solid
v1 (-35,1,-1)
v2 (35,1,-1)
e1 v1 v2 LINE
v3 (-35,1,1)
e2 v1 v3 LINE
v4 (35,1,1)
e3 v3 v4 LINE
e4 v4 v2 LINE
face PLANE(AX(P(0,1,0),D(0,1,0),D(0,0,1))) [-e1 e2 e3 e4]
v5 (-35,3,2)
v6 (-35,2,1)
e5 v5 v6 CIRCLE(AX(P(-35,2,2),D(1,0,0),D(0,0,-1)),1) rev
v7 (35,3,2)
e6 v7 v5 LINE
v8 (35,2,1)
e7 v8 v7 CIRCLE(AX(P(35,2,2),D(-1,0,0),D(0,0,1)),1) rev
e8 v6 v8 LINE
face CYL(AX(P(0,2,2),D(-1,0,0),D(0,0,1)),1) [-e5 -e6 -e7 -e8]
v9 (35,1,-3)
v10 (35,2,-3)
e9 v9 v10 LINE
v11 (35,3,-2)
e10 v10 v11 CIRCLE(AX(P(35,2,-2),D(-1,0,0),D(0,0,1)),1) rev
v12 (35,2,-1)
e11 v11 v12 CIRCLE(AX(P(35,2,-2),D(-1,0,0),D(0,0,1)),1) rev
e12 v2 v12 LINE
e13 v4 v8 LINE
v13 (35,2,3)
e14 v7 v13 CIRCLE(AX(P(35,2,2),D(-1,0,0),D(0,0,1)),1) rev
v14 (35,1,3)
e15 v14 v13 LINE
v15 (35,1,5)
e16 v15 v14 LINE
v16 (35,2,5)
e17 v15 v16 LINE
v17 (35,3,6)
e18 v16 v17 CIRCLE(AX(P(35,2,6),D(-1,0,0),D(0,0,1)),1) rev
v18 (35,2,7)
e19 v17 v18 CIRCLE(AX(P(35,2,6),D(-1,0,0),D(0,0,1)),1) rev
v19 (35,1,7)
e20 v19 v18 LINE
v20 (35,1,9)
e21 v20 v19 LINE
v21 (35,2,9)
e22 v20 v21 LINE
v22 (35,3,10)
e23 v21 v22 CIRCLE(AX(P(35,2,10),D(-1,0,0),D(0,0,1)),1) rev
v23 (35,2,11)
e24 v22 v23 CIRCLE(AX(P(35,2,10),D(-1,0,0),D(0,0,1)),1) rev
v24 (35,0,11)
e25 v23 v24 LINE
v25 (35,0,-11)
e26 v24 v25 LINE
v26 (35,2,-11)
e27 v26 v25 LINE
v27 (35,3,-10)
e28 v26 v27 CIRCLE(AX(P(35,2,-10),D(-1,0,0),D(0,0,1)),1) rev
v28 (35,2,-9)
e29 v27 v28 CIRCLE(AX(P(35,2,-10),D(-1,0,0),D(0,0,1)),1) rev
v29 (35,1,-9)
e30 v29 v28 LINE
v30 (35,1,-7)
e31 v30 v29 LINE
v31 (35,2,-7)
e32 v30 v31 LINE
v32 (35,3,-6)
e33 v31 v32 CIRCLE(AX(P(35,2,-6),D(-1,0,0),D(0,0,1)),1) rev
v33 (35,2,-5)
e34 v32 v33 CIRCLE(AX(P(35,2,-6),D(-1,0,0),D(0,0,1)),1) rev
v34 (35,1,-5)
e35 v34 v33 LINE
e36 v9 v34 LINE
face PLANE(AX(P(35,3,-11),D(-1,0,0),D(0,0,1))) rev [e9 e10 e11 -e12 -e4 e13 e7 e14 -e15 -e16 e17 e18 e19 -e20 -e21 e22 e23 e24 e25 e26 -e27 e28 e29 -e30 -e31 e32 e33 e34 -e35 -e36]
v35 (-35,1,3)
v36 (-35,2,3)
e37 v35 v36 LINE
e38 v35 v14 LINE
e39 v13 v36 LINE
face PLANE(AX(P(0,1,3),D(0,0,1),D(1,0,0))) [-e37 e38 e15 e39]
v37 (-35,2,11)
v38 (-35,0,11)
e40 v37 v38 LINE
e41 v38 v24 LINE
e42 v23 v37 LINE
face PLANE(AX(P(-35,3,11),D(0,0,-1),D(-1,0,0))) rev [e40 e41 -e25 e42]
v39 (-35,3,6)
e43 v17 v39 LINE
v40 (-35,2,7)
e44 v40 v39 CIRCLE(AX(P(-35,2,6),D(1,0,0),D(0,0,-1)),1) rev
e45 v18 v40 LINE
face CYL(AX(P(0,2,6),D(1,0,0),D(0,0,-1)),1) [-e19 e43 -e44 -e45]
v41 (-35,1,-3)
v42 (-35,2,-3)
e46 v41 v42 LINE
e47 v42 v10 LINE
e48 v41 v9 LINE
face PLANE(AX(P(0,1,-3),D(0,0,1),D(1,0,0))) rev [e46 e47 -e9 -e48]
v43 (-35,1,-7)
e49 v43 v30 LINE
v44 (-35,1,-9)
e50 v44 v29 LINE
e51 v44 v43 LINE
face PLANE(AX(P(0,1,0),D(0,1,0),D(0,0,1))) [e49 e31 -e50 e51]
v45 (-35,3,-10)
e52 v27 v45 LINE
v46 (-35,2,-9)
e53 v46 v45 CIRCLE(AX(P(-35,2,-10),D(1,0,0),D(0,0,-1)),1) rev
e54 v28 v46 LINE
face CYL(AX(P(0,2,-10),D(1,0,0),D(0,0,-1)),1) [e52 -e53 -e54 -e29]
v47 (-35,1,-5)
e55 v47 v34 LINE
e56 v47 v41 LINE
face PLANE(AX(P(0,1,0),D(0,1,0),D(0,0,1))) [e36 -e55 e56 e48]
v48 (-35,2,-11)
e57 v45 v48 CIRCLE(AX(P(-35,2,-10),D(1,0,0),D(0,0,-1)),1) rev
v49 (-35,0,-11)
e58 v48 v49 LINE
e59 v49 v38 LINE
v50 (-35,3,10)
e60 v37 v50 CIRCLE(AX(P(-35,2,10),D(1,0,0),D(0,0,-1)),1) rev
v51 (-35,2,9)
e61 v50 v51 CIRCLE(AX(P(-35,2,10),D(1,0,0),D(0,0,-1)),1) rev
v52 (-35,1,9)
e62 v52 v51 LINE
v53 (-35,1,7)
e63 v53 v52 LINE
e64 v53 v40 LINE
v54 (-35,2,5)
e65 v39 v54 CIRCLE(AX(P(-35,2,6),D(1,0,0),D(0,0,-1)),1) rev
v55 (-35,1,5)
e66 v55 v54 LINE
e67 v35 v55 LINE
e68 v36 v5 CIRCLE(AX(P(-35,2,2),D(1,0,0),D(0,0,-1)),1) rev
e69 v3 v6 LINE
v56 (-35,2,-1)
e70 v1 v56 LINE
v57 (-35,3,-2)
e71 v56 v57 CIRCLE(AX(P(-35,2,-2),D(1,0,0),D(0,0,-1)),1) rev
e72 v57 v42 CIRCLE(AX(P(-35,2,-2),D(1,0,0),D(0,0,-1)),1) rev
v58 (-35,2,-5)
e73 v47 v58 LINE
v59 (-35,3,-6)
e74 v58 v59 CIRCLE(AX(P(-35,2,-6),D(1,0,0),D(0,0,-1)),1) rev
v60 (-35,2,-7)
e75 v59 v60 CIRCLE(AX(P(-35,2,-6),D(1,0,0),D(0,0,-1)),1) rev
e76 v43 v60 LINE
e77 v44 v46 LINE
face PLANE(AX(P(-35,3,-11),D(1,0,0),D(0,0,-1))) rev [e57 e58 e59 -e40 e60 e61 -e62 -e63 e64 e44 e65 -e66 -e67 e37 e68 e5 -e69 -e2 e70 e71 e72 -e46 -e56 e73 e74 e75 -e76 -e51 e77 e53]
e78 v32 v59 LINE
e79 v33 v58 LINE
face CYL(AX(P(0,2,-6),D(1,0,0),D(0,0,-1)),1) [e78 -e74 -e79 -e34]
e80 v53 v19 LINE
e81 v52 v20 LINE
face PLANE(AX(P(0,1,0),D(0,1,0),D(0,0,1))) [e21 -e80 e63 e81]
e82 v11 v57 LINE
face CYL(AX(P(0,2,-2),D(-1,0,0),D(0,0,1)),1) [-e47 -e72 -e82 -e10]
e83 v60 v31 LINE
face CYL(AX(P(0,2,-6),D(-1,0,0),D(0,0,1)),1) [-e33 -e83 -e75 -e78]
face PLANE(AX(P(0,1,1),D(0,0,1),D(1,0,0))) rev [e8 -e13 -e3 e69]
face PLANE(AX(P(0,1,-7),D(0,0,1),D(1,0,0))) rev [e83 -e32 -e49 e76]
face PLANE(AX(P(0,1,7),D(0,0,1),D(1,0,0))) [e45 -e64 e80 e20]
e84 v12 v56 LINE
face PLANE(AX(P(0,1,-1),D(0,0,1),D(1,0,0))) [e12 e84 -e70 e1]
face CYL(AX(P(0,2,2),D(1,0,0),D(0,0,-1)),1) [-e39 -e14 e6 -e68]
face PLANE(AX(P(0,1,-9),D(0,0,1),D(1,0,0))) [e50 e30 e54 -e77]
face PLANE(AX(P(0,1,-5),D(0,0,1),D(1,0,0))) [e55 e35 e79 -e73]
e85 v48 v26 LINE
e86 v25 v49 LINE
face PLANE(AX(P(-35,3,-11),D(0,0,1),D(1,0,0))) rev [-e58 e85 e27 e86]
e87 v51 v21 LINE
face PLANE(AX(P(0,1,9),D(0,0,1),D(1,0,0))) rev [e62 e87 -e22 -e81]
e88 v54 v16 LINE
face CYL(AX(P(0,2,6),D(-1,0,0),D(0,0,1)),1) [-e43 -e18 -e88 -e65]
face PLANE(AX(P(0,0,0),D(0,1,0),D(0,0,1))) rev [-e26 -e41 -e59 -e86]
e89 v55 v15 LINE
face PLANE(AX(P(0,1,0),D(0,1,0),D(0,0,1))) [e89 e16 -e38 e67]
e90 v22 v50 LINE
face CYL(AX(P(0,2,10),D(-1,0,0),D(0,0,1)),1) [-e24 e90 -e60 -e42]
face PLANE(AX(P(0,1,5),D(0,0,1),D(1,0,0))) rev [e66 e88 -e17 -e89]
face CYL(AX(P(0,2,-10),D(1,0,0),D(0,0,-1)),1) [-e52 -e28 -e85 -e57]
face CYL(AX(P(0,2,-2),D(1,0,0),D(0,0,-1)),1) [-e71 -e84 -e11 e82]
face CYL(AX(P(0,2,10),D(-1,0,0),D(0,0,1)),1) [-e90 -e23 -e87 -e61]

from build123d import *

# Parameters (mm, degrees)
SKETCH_1_W          = 70
SKETCH_1_H          = 22
EXTRUDE_1_DEPTH     = 3
SKETCH_2_W          = 35
SKETCH_2_H          = 2
CUT_EXTRUDE_1_DEPTH = 2
FILLET_1_R          = 1


with BuildPart() as part:
    # 草图1 → 凸台-拉伸1 (new body)
    with BuildSketch(Plane(origin=(0, 0, 0), x_dir=(1, 0, 0), z_dir=(0, 1, 0))):
        Rectangle(SKETCH_1_W, SKETCH_1_H)
    extrude(amount=EXTRUDE_1_DEPTH)

    # 草图2 → 切除-拉伸1 (cut)
    with BuildSketch(Plane(origin=(0, 3, 0), x_dir=(1, 0, 0), z_dir=(0, 1, 0))):
        with Locations((17.5, -8)):
            Rectangle(SKETCH_2_W, SKETCH_2_H)
        with Locations((-17.5, -8)):
            Rectangle(SKETCH_2_W, SKETCH_2_H)
        with Locations((-17.5, -4)):
            Rectangle(SKETCH_2_W, SKETCH_2_H)
        with Locations((17.5, -4)):
            Rectangle(SKETCH_2_W, SKETCH_2_H)
        with Locations((17.5, 0)):
            Rectangle(SKETCH_2_W, SKETCH_2_H)
        with Locations((-17.5, 0)):
            Rectangle(SKETCH_2_W, SKETCH_2_H)
        with Locations((-17.5, 4)):
            Rectangle(SKETCH_2_W, SKETCH_2_H)
        with Locations((17.5, 4)):
            Rectangle(SKETCH_2_W, SKETCH_2_H)
        with Locations((17.5, 8)):
            Rectangle(SKETCH_2_W, SKETCH_2_H)
        with Locations((-17.5, 8)):
            Rectangle(SKETCH_2_W, SKETCH_2_H)
    extrude(amount=-CUT_EXTRUDE_1_DEPTH, mode=Mode.SUBTRACT)

    # 圆角1
    fillet_1_edges = [part.edges().sort_by_distance(p)[0] for p in [
        (0, 3, 11),
        (0, 3, 9),
        (0, 3, 7),
        (0, 3, 5),
        (0, 3, 3),
        (0, 3, 1),
        (0, 3, -1),
        (0, 3, -3),
        (0, 3, -5),
        (0, 3, -7),
        (0, 3, -9),
        (0, 3, -11),
    ]]
    fillet(fillet_1_edges, radius=FILLET_1_R - 0.0001)  # a hair under: the kernel refuses the full size


solid = part.part
